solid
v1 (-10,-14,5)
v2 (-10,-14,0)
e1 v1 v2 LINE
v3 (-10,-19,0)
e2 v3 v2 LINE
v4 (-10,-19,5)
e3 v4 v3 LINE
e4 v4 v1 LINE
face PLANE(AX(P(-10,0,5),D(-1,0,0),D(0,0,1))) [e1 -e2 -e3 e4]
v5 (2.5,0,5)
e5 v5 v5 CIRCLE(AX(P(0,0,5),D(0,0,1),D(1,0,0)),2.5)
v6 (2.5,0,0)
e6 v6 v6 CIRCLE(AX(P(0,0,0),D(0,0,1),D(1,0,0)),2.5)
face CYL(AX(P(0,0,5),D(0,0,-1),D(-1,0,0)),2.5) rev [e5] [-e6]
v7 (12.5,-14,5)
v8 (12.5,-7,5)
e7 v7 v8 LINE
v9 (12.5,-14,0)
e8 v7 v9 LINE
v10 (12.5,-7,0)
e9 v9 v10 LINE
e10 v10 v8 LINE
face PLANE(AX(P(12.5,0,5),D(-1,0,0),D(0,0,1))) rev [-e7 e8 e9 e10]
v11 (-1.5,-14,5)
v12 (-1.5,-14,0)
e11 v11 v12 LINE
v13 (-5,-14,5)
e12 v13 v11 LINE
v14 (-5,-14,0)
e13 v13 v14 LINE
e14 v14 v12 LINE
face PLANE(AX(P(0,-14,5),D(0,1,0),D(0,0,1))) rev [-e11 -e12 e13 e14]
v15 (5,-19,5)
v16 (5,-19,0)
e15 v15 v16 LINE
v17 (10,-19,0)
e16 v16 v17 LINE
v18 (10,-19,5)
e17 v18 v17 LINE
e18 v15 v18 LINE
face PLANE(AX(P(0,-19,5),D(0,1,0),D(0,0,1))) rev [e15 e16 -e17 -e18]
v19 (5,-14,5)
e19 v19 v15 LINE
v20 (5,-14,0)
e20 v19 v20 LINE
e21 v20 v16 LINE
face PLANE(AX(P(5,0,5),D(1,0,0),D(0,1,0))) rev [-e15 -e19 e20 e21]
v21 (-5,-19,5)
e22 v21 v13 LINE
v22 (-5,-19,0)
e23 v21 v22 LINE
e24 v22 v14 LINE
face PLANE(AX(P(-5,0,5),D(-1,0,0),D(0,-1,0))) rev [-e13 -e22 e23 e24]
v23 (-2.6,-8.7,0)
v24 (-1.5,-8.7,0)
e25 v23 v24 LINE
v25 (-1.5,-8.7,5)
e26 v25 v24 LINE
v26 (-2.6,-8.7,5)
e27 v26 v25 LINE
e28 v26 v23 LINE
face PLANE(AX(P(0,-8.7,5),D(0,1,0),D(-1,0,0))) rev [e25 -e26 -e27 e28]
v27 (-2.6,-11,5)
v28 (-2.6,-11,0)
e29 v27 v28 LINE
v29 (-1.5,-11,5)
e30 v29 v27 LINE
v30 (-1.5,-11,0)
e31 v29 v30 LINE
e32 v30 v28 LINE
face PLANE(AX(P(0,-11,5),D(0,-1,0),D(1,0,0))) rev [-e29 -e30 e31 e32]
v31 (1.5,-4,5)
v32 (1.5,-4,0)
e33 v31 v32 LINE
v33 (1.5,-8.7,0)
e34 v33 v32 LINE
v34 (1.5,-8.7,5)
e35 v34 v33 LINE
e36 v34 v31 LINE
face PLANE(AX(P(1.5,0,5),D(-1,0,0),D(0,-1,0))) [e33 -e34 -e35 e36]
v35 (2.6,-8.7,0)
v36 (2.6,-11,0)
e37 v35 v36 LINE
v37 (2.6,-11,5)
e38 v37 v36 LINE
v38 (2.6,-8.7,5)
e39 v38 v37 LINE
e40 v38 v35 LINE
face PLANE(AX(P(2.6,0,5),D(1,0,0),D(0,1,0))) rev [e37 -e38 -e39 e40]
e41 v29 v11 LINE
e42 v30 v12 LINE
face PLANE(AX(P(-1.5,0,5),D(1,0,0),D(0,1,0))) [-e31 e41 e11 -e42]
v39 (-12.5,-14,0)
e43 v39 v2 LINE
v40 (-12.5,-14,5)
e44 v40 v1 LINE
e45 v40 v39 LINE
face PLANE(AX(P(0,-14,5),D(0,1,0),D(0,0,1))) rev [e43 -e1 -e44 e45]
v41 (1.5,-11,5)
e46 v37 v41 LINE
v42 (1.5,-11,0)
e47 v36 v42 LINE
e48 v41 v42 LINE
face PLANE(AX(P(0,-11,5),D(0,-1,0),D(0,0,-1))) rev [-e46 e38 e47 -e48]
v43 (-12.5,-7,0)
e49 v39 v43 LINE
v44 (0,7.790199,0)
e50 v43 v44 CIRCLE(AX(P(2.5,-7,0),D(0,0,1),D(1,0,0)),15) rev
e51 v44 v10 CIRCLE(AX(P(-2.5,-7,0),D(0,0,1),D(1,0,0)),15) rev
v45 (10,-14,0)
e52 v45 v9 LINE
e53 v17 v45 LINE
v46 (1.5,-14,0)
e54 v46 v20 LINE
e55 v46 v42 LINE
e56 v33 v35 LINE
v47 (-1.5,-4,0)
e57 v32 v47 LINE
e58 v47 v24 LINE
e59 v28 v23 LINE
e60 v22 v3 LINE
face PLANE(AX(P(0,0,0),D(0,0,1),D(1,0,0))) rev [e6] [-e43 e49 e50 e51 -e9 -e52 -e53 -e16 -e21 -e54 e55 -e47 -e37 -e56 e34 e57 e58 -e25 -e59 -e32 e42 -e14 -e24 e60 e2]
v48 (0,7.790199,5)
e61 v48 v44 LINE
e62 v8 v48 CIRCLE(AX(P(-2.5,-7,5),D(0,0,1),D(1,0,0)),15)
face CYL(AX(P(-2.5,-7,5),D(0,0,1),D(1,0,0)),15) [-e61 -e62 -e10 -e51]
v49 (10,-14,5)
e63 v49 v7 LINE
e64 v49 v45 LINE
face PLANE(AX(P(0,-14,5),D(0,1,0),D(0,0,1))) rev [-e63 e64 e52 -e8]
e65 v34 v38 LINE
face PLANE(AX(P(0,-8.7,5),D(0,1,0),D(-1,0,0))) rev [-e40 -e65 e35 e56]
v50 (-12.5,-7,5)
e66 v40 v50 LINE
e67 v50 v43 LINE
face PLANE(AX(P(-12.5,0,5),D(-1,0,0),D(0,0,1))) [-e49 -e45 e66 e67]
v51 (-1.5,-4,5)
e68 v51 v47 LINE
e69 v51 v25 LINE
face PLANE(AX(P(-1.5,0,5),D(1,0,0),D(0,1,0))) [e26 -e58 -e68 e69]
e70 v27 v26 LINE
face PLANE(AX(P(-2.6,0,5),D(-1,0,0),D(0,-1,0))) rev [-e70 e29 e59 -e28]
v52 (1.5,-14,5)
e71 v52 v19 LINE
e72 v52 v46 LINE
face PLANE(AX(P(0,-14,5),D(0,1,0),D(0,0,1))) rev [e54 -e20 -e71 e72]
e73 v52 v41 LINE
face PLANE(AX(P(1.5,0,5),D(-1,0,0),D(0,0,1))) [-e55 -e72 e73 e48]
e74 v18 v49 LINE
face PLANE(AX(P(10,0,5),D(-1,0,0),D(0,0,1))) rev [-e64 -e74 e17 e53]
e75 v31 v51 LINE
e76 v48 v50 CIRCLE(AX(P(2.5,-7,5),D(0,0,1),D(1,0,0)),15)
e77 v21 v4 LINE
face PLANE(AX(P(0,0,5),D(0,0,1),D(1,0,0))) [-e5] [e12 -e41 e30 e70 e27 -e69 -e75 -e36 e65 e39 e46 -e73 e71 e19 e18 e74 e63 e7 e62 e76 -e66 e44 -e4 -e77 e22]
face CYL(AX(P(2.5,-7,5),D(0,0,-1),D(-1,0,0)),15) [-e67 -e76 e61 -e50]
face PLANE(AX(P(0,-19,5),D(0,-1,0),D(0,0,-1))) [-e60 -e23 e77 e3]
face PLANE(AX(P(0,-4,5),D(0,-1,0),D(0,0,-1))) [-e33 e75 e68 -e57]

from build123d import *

# Parameters (mm, degrees)
SKETCH1_R           = 2.5
SKETCH1_W           = 5
SKETCH1_H           = 5
BOSS_EXTRUDE1_DEPTH = 5
FILLET1_R           = 15


with BuildPart() as part:
    # Sketch1 → Boss-Extrude1 (new body)
    # profile 1 of 3: a face of its own
    with BuildSketch(Plane.XY):
        Polygon((-12.5, 8), (-12.5, -14), (-10, -14), (-5, -14), (-1.5, -14), (-1.5, -11), (-2.6, -11), (-2.6, -8.7), (-1.5, -8.7), (-1.5, -4), (1.5, -4), (1.5, -8.7), (2.6, -8.7), (2.6, -11), (1.5, -11), (1.5, -14), (5, -14), (10, -14), (12.5, -14), (12.5, 8), align=None)
        Circle(SKETCH1_R, mode=Mode.SUBTRACT)
    # profile 2 of 3: a face of its own
    with BuildSketch(Plane.XY):
        with Locations((-7.5, -16.5)):
            Rectangle(SKETCH1_W, SKETCH1_H)
    # profile 3 of 3: a face of its own
    with BuildSketch(Plane.XY):
        with Locations((7.5, -16.5)):
            Rectangle(SKETCH1_W, SKETCH1_H)
    extrude(amount=BOSS_EXTRUDE1_DEPTH)

    # Fillet1
    # the kernel refuses this fillet: 15 mm, written as the material it takes off along each edge
    with BuildSketch(Plane(origin=(-12.5, 8, -37.5), x_dir=(0, -1, 0), z_dir=(0, 0, 1)), Plane(origin=(12.5, 8, -37.5), x_dir=(-1, 0, 0), z_dir=(0, 0, 1))) as fillet1_piece_1:
        with BuildLine():
            CenterArc((FILLET1_R, FILLET1_R), FILLET1_R, 180, 90)
            Line((0, FILLET1_R), (0, 0))
            Line((0, 0), (FILLET1_R, 0))
        make_face()
    extrude(amount=80, mode=Mode.SUBTRACT)


solid = part.part
